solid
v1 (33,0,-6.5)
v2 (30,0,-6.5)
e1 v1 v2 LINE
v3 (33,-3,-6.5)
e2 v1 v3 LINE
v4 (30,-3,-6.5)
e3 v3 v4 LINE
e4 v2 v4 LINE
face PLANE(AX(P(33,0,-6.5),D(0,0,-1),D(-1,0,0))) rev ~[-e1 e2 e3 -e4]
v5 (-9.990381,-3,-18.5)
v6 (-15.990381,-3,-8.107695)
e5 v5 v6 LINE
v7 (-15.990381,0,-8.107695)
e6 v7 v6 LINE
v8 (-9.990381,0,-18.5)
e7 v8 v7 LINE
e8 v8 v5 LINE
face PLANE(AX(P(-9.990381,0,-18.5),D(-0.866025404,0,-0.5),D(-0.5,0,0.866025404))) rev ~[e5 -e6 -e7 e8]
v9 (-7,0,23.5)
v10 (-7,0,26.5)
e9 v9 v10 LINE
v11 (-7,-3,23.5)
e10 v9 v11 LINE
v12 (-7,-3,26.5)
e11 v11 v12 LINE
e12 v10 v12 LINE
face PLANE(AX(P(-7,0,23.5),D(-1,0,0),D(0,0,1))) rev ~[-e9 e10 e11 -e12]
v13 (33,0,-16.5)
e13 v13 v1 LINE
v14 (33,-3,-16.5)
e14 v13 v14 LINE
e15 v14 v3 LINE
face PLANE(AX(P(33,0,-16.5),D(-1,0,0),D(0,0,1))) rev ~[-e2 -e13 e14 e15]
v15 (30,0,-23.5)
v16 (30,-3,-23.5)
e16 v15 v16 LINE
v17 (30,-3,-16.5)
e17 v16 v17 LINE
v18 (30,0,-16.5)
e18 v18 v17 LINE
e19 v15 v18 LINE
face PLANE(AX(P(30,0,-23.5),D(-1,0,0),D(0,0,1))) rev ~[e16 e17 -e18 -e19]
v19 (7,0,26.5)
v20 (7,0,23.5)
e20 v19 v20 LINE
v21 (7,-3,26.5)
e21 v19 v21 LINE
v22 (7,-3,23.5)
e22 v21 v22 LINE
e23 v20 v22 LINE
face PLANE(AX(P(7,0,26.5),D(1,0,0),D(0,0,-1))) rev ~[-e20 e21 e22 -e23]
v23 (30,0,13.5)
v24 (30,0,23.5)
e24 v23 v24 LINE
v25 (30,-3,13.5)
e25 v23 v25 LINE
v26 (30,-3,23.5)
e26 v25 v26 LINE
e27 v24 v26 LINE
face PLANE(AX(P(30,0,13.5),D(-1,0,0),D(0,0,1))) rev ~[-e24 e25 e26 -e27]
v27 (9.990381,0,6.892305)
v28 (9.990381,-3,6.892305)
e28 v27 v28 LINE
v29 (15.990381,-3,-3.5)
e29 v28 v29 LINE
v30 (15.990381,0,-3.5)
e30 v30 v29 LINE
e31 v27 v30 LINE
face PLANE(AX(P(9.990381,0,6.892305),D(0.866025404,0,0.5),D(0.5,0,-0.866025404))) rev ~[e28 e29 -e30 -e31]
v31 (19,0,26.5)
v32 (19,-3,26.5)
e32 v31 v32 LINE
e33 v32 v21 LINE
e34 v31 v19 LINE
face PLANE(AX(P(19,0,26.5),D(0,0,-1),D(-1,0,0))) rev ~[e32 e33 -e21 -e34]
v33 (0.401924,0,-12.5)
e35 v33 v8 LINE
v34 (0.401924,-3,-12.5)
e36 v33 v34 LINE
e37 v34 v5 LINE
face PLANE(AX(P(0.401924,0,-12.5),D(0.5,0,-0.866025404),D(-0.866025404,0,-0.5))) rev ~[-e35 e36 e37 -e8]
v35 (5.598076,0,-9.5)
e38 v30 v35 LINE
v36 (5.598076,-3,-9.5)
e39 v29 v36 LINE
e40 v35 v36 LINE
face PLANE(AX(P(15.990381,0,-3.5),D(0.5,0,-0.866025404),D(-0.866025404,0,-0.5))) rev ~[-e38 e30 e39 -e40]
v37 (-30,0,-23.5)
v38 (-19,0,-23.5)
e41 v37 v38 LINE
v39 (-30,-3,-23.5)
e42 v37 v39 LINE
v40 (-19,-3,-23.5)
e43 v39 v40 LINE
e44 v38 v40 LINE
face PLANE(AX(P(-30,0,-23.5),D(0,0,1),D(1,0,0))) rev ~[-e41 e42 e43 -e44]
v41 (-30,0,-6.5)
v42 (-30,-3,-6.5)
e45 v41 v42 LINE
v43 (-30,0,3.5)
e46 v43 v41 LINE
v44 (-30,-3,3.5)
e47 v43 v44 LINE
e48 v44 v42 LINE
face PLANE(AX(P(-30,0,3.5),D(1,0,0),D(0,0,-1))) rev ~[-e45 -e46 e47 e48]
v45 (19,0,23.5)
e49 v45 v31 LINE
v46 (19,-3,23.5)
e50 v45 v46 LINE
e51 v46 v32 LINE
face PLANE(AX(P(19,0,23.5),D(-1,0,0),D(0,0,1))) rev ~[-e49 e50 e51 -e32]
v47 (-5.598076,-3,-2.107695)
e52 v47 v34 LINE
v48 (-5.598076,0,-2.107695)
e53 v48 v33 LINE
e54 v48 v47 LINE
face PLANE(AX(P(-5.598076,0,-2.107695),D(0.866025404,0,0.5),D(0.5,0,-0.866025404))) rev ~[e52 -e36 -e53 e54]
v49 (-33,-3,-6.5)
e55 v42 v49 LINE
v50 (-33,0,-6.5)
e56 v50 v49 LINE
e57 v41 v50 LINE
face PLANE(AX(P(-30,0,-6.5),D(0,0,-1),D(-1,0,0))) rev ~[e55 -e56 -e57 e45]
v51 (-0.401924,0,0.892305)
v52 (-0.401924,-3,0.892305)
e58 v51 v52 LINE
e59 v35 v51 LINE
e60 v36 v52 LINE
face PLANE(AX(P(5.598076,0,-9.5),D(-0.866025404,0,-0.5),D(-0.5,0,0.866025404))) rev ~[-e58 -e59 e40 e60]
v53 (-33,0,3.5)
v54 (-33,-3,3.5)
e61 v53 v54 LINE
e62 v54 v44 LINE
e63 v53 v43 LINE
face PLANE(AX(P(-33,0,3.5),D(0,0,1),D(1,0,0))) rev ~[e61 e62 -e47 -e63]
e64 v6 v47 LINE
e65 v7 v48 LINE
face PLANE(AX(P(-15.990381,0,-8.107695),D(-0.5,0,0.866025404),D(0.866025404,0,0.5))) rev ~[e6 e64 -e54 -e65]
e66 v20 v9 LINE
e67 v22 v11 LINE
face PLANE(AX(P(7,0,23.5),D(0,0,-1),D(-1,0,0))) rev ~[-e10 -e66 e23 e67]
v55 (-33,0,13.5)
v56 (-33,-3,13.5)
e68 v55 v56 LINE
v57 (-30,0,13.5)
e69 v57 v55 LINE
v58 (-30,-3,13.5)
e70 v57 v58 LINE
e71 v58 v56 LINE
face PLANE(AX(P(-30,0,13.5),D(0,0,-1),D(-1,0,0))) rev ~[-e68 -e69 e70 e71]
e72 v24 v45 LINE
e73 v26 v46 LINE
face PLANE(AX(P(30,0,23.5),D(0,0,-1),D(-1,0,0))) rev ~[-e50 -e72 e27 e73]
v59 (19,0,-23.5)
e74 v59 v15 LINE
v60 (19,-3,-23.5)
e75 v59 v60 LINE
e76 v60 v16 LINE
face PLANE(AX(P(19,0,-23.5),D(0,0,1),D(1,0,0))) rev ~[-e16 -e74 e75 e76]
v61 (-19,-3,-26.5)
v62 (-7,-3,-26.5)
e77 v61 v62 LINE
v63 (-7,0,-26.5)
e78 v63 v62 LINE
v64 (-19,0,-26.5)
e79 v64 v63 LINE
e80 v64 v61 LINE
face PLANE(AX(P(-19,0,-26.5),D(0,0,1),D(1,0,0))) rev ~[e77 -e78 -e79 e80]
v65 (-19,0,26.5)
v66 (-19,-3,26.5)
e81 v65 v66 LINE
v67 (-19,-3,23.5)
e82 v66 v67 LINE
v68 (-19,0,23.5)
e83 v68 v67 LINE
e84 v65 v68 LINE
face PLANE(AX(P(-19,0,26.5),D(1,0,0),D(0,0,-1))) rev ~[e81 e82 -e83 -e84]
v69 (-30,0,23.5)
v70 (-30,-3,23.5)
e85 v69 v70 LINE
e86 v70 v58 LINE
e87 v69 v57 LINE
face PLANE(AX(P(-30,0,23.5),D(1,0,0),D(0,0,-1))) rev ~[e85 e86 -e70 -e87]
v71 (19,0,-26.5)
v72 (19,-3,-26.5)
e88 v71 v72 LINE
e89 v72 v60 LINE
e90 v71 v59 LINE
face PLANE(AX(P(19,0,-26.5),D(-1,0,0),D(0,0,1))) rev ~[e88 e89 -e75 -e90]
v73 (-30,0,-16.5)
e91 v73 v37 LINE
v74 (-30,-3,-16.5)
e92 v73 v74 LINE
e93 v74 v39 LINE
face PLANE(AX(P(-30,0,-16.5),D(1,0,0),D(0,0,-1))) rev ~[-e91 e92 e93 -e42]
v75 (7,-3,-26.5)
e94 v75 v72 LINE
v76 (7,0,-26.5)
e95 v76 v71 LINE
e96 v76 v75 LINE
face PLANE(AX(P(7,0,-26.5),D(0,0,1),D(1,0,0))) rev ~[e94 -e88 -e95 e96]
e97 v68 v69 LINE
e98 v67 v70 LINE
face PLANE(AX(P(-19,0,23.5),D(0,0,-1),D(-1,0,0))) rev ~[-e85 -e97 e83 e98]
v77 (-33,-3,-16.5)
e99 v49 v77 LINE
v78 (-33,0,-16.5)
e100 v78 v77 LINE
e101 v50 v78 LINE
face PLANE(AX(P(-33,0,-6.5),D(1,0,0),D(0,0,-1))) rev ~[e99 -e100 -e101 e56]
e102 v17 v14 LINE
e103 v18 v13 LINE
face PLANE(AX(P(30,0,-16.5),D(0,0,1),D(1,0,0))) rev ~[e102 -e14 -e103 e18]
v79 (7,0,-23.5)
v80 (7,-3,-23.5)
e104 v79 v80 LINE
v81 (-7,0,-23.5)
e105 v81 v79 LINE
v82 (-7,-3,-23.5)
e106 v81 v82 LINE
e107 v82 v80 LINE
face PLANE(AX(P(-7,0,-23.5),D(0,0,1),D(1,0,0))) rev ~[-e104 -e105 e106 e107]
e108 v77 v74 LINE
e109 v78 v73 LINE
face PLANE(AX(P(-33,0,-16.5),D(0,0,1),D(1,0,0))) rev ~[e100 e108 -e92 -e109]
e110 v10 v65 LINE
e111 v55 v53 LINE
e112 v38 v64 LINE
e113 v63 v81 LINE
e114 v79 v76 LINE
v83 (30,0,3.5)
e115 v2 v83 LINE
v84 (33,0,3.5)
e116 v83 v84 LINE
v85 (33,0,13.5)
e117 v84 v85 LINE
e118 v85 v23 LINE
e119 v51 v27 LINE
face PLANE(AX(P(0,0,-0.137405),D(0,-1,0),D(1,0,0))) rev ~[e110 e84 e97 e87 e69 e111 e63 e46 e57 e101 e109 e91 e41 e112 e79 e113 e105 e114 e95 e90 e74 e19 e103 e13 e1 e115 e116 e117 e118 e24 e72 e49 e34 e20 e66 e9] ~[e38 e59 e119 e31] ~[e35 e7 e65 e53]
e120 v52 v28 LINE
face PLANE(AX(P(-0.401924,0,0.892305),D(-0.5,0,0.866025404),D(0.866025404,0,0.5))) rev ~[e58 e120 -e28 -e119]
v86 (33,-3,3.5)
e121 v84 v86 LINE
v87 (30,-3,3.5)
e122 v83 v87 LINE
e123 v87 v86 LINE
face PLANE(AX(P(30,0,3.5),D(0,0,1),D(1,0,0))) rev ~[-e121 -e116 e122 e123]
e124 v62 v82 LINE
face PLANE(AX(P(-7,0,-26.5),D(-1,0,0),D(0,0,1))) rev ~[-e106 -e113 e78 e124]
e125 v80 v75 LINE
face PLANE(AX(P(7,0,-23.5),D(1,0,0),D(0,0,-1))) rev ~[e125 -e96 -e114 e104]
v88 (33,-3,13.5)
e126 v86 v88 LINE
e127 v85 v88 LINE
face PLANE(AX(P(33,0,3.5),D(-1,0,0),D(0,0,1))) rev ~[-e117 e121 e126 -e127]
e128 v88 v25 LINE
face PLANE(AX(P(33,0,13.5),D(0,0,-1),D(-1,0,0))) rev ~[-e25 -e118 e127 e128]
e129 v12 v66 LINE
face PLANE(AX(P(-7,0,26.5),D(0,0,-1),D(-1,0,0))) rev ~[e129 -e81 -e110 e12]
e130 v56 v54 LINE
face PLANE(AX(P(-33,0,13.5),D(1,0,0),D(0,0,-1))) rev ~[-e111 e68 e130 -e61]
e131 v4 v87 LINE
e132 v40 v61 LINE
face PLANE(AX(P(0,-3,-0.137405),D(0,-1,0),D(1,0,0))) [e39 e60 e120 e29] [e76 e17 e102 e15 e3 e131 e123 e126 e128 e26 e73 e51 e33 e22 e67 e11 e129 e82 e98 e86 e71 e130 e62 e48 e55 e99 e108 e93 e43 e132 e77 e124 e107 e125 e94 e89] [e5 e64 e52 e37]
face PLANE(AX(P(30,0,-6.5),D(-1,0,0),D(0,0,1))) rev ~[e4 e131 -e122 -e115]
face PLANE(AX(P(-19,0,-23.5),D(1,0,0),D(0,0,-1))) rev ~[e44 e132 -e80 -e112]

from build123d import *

# Parameters (mm, degrees)
F1_DEPTH = 3


# Not quite as in the source:
# - a feature names something its author has since deleted; it is built from what else it names


with BuildPart() as f1:
    # F0 (on Front) → F1 (new body)
    with BuildSketch(Plane.XZ):
        Polygon((-19, 26.5), (-19, 23.5), (-30, 23.5), (-30, 13.5), (-33, 13.5), (-33, 3.5), (-30, 3.5), (-30, -6.5), (-33, -6.5), (-33, -16.5), (-30, -16.5), (-30, -23.5), (-19, -23.5), (-19, -26.5), (-7, -26.5), (-7, -23.5), (7, -23.5), (7, -26.5), (19, -26.5), (19, -23.5), (30, -23.5), (30, -16.5), (33, -16.5), (33, -6.5), (30, -6.5), (30, 3.5), (33, 3.5), (33, 13.5), (30, 13.5), (30, 23.5), (19, 23.5), (19, 26.5), (7, 26.5), (7, 23.5), (-7, 23.5), (-7, 26.5), align=None)
        Polygon((0.4019237886, -12.5), (-9.9903810568, -18.5), (-15.9903810568, -8.1076951546), (-5.5980762114, -2.1076951546), align=None, mode=Mode.SUBTRACT)
        Polygon((-0.4019237886, 0.8923048454), (9.9903810568, 6.8923048454), (15.9903810568, -3.5), (5.5980762114, -9.5), align=None, mode=Mode.SUBTRACT)
    extrude(amount=F1_DEPTH)


solid = f1.part
